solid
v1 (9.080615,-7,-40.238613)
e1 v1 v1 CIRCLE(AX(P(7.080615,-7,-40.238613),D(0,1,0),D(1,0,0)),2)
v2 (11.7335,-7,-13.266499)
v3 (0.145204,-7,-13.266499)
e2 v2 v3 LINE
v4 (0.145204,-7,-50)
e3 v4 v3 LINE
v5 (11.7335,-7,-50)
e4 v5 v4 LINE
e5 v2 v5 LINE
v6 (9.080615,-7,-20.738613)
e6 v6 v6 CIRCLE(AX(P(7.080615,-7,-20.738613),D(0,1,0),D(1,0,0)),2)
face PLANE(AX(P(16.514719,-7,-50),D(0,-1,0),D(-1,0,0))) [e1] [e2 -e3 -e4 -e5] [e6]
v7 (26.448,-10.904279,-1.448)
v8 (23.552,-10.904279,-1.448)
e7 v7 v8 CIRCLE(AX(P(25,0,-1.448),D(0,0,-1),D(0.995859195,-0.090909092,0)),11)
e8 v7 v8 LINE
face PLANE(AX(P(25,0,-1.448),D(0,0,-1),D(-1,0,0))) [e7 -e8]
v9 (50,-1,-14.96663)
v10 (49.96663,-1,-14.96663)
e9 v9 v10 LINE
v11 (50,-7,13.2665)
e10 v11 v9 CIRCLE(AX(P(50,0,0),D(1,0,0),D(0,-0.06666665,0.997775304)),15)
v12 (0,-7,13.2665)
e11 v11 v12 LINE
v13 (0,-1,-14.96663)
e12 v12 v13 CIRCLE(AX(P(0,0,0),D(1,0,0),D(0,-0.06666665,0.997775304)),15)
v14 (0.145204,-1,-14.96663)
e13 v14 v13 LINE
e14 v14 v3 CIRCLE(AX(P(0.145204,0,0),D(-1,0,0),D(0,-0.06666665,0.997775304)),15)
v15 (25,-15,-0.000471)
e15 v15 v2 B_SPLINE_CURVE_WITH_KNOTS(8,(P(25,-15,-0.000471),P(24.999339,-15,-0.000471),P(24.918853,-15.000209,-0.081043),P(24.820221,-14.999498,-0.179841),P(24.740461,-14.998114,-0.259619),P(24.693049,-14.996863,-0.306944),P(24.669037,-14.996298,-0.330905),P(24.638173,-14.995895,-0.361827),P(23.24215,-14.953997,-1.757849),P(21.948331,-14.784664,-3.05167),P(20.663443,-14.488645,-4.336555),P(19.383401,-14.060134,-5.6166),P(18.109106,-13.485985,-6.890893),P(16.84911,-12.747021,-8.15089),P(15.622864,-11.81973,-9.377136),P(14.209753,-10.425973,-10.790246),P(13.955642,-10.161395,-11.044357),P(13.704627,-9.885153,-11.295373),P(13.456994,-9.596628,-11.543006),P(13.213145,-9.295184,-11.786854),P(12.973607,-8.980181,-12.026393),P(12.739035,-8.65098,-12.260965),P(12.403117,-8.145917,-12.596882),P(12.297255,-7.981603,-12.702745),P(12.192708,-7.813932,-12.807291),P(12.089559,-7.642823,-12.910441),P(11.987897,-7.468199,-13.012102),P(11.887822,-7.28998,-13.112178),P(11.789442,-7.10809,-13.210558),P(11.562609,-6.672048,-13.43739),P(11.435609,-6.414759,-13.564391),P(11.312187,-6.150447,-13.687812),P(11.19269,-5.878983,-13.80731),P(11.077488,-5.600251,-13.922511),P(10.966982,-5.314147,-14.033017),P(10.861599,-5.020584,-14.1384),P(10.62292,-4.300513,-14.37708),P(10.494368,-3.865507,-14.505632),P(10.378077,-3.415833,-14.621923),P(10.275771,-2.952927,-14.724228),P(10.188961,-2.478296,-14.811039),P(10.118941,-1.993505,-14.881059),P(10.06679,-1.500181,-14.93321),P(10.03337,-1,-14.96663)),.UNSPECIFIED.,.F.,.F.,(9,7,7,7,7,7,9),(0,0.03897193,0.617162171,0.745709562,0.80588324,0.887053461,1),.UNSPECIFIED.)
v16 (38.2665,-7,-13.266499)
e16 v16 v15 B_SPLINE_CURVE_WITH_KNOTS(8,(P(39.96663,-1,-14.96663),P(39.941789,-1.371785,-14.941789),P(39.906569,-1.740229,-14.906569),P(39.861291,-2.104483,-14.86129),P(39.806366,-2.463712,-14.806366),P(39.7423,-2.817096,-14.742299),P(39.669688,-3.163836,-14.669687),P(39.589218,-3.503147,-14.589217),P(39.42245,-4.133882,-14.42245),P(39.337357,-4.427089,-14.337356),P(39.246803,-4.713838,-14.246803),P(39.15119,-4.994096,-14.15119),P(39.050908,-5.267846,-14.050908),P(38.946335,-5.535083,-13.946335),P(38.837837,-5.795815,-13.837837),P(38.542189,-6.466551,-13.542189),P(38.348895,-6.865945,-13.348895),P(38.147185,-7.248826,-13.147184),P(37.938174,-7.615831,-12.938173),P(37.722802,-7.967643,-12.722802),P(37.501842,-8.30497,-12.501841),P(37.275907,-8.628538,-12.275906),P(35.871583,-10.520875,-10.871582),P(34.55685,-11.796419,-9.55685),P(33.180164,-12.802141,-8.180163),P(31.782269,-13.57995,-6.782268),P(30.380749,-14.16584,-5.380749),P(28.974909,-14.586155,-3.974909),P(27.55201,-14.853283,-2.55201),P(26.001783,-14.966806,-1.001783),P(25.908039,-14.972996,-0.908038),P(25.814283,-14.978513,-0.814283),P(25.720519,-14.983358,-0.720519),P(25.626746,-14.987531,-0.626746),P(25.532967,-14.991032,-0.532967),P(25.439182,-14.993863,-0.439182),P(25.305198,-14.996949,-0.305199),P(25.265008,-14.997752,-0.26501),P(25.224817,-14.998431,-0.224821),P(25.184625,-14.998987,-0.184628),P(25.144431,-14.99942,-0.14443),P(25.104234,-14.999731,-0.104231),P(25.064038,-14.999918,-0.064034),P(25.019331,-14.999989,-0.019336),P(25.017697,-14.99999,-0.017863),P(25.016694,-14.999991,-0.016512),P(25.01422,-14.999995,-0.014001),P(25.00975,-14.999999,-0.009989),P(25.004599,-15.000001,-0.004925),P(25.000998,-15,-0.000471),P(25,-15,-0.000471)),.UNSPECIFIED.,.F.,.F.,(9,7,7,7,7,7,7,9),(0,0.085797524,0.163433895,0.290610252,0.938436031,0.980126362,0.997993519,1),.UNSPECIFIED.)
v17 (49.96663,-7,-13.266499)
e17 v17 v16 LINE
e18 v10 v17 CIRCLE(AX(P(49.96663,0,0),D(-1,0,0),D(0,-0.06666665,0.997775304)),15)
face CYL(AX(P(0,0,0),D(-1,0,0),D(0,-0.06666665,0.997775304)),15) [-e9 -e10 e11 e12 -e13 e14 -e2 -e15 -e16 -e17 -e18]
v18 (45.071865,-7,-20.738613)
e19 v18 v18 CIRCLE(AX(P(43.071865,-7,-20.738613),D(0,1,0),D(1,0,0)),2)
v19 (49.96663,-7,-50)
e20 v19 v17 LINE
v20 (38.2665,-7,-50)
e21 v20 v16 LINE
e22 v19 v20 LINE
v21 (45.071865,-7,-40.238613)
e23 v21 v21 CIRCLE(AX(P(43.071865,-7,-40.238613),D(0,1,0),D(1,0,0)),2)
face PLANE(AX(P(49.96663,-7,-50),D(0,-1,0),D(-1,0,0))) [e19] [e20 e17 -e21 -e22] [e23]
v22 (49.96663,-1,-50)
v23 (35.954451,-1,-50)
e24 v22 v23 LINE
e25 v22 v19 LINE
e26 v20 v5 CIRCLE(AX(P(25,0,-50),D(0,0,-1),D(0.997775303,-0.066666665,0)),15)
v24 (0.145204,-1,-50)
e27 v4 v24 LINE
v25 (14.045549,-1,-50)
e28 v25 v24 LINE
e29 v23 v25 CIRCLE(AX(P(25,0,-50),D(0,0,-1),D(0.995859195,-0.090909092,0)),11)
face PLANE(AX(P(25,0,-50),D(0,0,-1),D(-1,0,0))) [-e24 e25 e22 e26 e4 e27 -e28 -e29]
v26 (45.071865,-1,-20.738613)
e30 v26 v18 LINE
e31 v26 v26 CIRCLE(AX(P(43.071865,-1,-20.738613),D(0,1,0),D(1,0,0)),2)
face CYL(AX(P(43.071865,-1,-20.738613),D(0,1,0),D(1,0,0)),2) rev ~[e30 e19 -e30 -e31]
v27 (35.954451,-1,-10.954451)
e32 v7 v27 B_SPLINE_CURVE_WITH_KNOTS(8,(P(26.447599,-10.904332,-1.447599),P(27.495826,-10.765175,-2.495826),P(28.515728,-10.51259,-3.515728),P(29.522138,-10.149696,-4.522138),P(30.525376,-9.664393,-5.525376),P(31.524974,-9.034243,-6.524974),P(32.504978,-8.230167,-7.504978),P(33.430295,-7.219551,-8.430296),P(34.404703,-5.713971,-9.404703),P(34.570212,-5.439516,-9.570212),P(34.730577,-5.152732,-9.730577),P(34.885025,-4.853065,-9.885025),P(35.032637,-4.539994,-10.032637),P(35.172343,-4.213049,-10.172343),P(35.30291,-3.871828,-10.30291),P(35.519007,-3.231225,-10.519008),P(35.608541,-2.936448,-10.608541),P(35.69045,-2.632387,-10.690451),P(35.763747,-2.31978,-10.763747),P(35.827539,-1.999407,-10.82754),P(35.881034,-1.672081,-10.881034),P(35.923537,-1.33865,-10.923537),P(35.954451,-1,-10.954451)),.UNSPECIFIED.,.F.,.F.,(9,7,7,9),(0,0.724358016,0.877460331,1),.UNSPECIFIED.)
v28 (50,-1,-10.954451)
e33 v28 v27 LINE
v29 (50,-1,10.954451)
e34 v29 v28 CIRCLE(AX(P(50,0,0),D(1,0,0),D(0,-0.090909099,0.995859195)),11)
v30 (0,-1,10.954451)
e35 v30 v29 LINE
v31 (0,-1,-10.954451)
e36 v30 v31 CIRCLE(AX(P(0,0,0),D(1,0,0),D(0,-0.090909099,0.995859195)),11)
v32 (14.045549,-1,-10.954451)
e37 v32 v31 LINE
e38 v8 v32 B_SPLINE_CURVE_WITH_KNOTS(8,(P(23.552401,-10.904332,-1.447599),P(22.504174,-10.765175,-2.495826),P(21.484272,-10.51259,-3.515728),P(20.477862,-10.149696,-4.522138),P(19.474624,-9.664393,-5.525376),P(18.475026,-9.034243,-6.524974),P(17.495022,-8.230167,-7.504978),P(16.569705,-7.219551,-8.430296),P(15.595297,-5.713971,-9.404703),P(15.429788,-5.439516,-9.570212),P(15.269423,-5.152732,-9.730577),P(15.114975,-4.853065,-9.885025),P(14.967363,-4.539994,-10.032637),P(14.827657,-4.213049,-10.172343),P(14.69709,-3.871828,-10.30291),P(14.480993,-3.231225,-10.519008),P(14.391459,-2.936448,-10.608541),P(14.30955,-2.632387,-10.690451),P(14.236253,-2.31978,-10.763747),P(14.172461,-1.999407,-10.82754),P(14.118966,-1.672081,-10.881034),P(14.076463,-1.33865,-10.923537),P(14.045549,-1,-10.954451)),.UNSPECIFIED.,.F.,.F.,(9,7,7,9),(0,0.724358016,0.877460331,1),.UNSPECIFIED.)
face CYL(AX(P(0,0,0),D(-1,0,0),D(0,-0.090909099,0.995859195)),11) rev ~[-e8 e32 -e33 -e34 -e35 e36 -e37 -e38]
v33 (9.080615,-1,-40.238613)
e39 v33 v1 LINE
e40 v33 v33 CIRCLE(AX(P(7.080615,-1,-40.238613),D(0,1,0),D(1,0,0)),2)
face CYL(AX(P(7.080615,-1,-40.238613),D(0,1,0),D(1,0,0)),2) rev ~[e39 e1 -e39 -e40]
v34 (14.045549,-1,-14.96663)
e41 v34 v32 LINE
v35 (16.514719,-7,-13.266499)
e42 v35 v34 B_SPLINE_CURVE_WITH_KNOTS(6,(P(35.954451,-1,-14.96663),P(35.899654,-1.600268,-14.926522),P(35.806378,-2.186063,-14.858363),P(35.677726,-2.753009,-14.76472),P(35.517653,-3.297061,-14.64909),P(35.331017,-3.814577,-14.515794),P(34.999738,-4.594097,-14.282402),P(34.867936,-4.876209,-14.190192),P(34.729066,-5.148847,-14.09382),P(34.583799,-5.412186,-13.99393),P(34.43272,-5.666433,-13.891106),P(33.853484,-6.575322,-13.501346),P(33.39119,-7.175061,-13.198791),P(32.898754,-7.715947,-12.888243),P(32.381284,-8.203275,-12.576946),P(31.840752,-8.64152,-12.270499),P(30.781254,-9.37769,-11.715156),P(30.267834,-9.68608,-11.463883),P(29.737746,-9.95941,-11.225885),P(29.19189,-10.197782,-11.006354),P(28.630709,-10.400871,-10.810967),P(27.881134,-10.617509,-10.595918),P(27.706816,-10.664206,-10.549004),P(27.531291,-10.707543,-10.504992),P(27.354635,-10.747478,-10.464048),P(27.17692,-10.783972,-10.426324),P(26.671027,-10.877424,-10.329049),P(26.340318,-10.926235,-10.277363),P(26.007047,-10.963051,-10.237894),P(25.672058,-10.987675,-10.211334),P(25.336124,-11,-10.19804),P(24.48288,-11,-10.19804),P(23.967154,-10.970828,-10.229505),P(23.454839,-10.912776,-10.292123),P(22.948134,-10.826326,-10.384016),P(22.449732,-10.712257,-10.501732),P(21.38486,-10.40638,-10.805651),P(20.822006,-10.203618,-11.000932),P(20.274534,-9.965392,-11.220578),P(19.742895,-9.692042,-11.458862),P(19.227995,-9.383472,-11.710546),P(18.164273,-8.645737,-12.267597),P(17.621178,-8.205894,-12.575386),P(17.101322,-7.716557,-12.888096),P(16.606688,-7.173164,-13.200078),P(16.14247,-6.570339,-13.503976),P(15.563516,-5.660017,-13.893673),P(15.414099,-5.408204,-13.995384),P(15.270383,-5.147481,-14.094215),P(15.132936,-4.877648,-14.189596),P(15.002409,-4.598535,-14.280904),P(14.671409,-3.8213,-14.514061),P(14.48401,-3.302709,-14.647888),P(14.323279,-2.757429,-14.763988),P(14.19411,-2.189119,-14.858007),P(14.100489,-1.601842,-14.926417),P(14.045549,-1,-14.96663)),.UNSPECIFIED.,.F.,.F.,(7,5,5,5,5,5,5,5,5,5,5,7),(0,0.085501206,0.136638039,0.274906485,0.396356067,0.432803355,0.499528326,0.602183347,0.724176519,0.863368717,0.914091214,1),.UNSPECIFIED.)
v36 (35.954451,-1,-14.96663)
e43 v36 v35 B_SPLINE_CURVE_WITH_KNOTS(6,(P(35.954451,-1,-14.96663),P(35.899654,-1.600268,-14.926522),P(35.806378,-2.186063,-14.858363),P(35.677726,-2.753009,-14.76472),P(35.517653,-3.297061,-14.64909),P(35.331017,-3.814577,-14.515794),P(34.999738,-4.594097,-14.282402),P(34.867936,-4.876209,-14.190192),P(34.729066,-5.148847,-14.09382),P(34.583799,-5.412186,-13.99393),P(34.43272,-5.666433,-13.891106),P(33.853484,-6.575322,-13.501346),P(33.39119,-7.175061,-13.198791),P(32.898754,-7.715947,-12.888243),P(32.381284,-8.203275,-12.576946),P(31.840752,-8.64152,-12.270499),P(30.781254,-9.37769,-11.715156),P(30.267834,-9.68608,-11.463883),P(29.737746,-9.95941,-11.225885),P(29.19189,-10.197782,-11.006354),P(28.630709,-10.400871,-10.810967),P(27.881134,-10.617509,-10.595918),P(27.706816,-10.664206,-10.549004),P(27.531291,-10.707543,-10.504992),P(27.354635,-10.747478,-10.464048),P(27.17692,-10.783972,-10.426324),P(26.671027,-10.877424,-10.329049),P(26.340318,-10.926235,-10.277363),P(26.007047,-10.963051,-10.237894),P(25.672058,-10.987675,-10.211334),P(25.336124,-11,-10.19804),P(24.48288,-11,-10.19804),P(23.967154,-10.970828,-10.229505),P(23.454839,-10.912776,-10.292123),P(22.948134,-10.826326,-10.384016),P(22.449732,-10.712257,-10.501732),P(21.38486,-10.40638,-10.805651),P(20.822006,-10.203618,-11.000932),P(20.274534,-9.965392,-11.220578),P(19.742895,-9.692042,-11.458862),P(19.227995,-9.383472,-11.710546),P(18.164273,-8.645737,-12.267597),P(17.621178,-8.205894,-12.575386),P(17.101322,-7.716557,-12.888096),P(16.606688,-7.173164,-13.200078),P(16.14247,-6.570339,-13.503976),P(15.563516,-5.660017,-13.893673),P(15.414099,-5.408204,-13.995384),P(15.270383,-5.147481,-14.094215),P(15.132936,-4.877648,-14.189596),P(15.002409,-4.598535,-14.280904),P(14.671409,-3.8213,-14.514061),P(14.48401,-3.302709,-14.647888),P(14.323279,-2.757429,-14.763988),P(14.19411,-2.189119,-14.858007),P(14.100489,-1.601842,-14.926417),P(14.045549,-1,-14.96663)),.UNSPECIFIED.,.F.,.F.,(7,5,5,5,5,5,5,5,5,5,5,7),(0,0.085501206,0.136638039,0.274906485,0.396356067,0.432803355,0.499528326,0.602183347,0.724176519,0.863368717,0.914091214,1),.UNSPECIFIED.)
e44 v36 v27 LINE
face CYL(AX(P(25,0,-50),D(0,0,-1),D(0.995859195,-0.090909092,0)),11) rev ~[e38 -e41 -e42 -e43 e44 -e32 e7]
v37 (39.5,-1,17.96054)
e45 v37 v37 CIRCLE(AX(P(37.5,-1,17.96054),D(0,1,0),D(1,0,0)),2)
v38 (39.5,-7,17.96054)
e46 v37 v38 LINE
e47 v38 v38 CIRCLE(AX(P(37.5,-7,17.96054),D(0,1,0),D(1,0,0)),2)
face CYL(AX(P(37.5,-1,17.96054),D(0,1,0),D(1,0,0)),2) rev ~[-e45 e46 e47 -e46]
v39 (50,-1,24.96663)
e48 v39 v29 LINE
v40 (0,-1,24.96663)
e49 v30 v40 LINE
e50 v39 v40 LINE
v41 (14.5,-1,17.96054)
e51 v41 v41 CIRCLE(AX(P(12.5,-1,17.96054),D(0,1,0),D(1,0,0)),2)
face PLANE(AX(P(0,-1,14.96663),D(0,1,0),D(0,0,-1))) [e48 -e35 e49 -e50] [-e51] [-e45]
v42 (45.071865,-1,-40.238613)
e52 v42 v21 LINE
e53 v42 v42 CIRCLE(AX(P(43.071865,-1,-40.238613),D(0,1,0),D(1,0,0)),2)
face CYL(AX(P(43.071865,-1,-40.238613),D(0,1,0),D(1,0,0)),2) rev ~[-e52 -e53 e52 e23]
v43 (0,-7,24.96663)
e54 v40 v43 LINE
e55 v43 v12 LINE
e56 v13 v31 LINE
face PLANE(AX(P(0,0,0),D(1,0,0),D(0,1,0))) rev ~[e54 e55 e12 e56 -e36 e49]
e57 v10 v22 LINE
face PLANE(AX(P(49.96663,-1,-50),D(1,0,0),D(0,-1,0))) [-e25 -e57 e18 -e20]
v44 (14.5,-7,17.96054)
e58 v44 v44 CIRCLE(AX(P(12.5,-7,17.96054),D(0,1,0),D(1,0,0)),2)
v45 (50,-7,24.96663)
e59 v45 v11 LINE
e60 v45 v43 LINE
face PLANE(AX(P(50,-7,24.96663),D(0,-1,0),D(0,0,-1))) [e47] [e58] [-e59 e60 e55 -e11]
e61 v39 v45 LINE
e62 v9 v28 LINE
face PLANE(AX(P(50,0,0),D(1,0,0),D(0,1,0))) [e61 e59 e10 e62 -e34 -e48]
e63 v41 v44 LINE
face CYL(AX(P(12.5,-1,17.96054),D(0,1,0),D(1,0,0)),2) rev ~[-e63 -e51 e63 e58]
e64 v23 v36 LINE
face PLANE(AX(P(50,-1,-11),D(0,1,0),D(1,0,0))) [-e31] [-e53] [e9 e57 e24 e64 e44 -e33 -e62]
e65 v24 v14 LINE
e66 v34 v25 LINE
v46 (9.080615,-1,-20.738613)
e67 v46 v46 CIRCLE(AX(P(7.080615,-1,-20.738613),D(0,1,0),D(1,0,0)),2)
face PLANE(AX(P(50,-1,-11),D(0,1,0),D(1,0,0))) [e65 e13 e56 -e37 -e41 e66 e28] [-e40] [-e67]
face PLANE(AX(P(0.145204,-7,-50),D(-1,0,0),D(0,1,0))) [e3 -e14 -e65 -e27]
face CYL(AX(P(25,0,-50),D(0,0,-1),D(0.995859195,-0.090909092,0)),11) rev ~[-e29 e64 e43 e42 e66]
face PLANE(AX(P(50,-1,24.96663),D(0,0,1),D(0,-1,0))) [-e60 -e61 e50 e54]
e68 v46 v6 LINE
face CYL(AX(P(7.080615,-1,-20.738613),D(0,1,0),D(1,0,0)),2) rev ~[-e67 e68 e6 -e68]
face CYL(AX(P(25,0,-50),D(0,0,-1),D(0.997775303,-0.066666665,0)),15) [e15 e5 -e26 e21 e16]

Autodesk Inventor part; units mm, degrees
ref_plane "YZ Plane" through (0, 0, 0) normal (1, 0, 0) x (0, 1, 0)
ref_plane "XZ Plane" through (0, 0, 0) normal (0, 1, 0) x (-1, 0, 0)
ref_plane "XY Plane" through (0, 0, 0) normal (0, 0, 1) x (1, 0, 0)
sketch "Sketch1" plane through (0, 0, 0) normal (1, 0, 0) x (0, 1, 0)
  arc A0 (-1, 14.96663) -> (0, -15) centre (0, 0) ccw
  arc A1 (-1, 10.954451) -> (0, -11) centre (0, 0) ccw
  line L0 (0, 15) -> (0, -15)
  line L1 (-1, 14.96663) -> (-1, 10.954451)
  point P0 (0, 11.5)
  dimension "d0" = 30
  dimension "d1" = 22
extrude "Extrusion1" add sketch "Sketch1" along normal blind 50
sketch "Sketch2" plane through (50, 0, 0) normal (1, 0, 0) x (0, 0, -1)
  line L0 (-10.954451, -1) -> (-14.96663, -1)
  line L1 (-14.96663, -1) -> (-24.96663, -1)
  line L2 (-24.96663, -1) -> (-24.96663, -7)
  line L3 (-24.96663, -7) -> (-13.211534, -7)
  arc A0 (-14.96663, -1) -> (15, 0) centre (0, 0) ccw
  line L4 (-14.96663, -1) -> (-13.211534, -7)
  point P0 (-13.266499, -7)
  dimension "d5" = 10
  dimension "d6" = 6
extrude "Extrusion2" add sketch "Sketch2" against normal blind 50 contours A0 L3 L2 L1
sketch "Sketch3" plane through (0, 0, 0) normal (0, 1, 0) x (-1, 0, 0)
  line L0 (0, 0) -> (-25, 0) construction
  line L1 (-25, 0) -> (-25, -50) construction
  dimension "d9" = 25
  dimension "d10" = 50
ref_plane "Work Plane1" through (25, 0, -50) normal (0, 0, -1) x (-1, 0, 0)
sketch "Sketch4" plane through (25, 0, -50) normal (0, 0, -1) x (-1, 0, 0)
  line L0 (25, 0) -> (-25, 0)
  arc A0 (-10.954451, -1) -> (10.954451, -1) centre (0, 0) ccw
  arc A1 (-14.96663, -1) -> (14.96663, -1) centre (0, 0) ccw
  line L1 (25, -1) -> (-25, -1)
  line L2 (-14.96663, -1) -> (14.96663, -1)
  point P0 (-10.954451, -1)
  point P1 (10.954451, -1)
  dimension "d11" = 22
  dimension "d12" = 30
extrude "Extrusion3" add sketch "Sketch4" against normal up to next contours A0 L1 A1
sketch "Sketch5" plane through (25, 0, -50) normal (0, 0, -1) x (-1, 0, 0)
  arc A0 (-10.954451, -1) -> (10.954451, -1) centre (0, 0) ccw
  circle A1 centre (0, 0) radius 11
  line L0 (25, -1) -> (-25, -1)
  line L1 (14.854796, -1) -> (24.854796, -1)
  arc A2 (-14.96663, -1) -> (0, -15) centre (0, 0) ccw
  line L2 (-14.96663, -1) -> (-24.96663, -1)
  line L3 (-24.96663, -1) -> (-24.96663, -7)
  line L4 (-24.96663, -7) -> (24.854796, -7)
  line L5 (24.854796, -7) -> (24.854796, -1)
  line L6 (-24.96663, -1) -> (24.854796, -1)
  point P0 (25, 0)
  point P1 (-13.266499, -7)
  point P2 (8.485281, -7)
  dimension "d15" = 10
  dimension "d16" = 10
  dimension "d17" = 6
extrude "Extrusion4" add sketch "Sketch5" against normal blind 38.302 contours L0 L5 L4 A0 | A2 L4 L3 L0
sketch "Sketch6" plane through (25, 0, -50) normal (0, 0, -1) x (-1, 0, 0)
  line L0 (25, 0) -> (-25, 0)
  arc A0 (-10.954451, -1) -> (10.954451, -1) centre (0, 0) ccw
  circle A1 centre (0, 0) radius 11
  point P0 (-11, 0)
  point P1 (-10.954451, -1)
  point P2 (11, 0)
extrude "Extrusion5" cut sketch "Sketch6" against normal blind 48.552 contours A1 A0 L0
sketch "Sketch7" plane through (50, 0, -11) normal (0, 1, 0) x (1, 0, 0)
  line L0 (1.146492, -0.964321) -> (-15.803609, -0.964321)
  line L1 (-15.803609, -0.964321) -> (-15.803609, 5.725768)
  line L2 (-15.803609, 5.725768) -> (1.146492, 5.725768)
  line L3 (1.146492, 5.725768) -> (1.146492, -0.964321)
  line L4 (-26.448, -9.552) -> (-36, 0)
  line L5 (-34.667708, -1.332292) -> (-52.233675, -1.332292)
  line L6 (-52.233675, -1.332292) -> (-52.233675, 5.725768)
  line L7 (-52.233675, 5.725768) -> (-34.667708, 5.725768)
  line L8 (-34.667708, 5.725768) -> (-34.667708, -1.332292)
  point P0 (-50, -11)
extrude "Extrusion6" cut sketch "Sketch7" against normal blind 1
sketch "Sketch8" plane through (35.954451, -1, -10.954451) normal (0, 1, 0) x (1, 0, 0)
  line L0 (0, 39.045549) -> (14.012178, 39.045549)
  line L1 (0, 0) -> (-9.506451, -9.506451)
  line L2 (14.012178, 39.045549) -> (14.012178, 4.012178)
  line L3 (0.045549, 19.522774) -> (14.189279, 0.045549) construction
  circle A0 centre (7.117414, 9.784162) radius 2
  line L4 (0.045549, 19.522774) -> (14.012178, 39.045549) construction
  line L5 (0.045549, 19.522774) -> (-21.938424, 19.522774) construction
  line L6 (-21.938424, 19.522774) -> (-35.954451, 39.045549) construction
  line L7 (2.312048, 39.045549) -> (-24.22095, 39.045549) construction
  line L8 (-21.938424, 39.045549) -> (-35.809247, 19.522774) construction
  line L9 (-35.809247, 39.045549) -> (-35.809247, 2.312048) construction
  line L10 (7.117414, 9.784162) -> (-28.873836, 9.784162) construction
  line L11 (-28.873836, 9.784162) -> (-28.873836, 29.284162) construction
  line L12 (-28.873836, 29.284162) -> (7.117414, 29.284162) construction
  line L13 (7.117414, 29.284162) -> (7.117414, 9.784162) construction
  circle A1 centre (-28.873836, 9.784162) radius 2
  circle A2 centre (7.117414, 29.284162) radius 2
  circle A3 centre (-28.873836, 29.284162) radius 2
  line L14 (-35.954451, -21.908902) -> (14.045549, -21.908902) construction
  line L15 (-10.954451, -21.908902) -> (-35.954451, -35.954451) construction
  line L16 (-35.954451, -21.908902) -> (-35.954451, -35.921081)
  line L17 (-10.954451, -35.921081) -> (14.045549, -21.908902) construction
  line L18 (14.045549, -35.921081) -> (-35.954451, -35.921081) construction
  line L19 (14.045549, -35.921081) -> (-10.954451, -21.908902) construction
  circle A4 centre (1.545549, -28.914991) radius 2
  circle A5 centre (-23.454451, -28.914991) radius 2
  point P0 (-35.954451, -10.954451)
  dimension "d24" = 4
  dimension "d25" = 4
  dimension "d26" = 4
  dimension "d27" = 4
  dimension "d28" = 4
  dimension "d29" = 4
extrude "Extrusion7" cut sketch "Sketch8" against normal blind 48.552
properties part number "betterTconection"
